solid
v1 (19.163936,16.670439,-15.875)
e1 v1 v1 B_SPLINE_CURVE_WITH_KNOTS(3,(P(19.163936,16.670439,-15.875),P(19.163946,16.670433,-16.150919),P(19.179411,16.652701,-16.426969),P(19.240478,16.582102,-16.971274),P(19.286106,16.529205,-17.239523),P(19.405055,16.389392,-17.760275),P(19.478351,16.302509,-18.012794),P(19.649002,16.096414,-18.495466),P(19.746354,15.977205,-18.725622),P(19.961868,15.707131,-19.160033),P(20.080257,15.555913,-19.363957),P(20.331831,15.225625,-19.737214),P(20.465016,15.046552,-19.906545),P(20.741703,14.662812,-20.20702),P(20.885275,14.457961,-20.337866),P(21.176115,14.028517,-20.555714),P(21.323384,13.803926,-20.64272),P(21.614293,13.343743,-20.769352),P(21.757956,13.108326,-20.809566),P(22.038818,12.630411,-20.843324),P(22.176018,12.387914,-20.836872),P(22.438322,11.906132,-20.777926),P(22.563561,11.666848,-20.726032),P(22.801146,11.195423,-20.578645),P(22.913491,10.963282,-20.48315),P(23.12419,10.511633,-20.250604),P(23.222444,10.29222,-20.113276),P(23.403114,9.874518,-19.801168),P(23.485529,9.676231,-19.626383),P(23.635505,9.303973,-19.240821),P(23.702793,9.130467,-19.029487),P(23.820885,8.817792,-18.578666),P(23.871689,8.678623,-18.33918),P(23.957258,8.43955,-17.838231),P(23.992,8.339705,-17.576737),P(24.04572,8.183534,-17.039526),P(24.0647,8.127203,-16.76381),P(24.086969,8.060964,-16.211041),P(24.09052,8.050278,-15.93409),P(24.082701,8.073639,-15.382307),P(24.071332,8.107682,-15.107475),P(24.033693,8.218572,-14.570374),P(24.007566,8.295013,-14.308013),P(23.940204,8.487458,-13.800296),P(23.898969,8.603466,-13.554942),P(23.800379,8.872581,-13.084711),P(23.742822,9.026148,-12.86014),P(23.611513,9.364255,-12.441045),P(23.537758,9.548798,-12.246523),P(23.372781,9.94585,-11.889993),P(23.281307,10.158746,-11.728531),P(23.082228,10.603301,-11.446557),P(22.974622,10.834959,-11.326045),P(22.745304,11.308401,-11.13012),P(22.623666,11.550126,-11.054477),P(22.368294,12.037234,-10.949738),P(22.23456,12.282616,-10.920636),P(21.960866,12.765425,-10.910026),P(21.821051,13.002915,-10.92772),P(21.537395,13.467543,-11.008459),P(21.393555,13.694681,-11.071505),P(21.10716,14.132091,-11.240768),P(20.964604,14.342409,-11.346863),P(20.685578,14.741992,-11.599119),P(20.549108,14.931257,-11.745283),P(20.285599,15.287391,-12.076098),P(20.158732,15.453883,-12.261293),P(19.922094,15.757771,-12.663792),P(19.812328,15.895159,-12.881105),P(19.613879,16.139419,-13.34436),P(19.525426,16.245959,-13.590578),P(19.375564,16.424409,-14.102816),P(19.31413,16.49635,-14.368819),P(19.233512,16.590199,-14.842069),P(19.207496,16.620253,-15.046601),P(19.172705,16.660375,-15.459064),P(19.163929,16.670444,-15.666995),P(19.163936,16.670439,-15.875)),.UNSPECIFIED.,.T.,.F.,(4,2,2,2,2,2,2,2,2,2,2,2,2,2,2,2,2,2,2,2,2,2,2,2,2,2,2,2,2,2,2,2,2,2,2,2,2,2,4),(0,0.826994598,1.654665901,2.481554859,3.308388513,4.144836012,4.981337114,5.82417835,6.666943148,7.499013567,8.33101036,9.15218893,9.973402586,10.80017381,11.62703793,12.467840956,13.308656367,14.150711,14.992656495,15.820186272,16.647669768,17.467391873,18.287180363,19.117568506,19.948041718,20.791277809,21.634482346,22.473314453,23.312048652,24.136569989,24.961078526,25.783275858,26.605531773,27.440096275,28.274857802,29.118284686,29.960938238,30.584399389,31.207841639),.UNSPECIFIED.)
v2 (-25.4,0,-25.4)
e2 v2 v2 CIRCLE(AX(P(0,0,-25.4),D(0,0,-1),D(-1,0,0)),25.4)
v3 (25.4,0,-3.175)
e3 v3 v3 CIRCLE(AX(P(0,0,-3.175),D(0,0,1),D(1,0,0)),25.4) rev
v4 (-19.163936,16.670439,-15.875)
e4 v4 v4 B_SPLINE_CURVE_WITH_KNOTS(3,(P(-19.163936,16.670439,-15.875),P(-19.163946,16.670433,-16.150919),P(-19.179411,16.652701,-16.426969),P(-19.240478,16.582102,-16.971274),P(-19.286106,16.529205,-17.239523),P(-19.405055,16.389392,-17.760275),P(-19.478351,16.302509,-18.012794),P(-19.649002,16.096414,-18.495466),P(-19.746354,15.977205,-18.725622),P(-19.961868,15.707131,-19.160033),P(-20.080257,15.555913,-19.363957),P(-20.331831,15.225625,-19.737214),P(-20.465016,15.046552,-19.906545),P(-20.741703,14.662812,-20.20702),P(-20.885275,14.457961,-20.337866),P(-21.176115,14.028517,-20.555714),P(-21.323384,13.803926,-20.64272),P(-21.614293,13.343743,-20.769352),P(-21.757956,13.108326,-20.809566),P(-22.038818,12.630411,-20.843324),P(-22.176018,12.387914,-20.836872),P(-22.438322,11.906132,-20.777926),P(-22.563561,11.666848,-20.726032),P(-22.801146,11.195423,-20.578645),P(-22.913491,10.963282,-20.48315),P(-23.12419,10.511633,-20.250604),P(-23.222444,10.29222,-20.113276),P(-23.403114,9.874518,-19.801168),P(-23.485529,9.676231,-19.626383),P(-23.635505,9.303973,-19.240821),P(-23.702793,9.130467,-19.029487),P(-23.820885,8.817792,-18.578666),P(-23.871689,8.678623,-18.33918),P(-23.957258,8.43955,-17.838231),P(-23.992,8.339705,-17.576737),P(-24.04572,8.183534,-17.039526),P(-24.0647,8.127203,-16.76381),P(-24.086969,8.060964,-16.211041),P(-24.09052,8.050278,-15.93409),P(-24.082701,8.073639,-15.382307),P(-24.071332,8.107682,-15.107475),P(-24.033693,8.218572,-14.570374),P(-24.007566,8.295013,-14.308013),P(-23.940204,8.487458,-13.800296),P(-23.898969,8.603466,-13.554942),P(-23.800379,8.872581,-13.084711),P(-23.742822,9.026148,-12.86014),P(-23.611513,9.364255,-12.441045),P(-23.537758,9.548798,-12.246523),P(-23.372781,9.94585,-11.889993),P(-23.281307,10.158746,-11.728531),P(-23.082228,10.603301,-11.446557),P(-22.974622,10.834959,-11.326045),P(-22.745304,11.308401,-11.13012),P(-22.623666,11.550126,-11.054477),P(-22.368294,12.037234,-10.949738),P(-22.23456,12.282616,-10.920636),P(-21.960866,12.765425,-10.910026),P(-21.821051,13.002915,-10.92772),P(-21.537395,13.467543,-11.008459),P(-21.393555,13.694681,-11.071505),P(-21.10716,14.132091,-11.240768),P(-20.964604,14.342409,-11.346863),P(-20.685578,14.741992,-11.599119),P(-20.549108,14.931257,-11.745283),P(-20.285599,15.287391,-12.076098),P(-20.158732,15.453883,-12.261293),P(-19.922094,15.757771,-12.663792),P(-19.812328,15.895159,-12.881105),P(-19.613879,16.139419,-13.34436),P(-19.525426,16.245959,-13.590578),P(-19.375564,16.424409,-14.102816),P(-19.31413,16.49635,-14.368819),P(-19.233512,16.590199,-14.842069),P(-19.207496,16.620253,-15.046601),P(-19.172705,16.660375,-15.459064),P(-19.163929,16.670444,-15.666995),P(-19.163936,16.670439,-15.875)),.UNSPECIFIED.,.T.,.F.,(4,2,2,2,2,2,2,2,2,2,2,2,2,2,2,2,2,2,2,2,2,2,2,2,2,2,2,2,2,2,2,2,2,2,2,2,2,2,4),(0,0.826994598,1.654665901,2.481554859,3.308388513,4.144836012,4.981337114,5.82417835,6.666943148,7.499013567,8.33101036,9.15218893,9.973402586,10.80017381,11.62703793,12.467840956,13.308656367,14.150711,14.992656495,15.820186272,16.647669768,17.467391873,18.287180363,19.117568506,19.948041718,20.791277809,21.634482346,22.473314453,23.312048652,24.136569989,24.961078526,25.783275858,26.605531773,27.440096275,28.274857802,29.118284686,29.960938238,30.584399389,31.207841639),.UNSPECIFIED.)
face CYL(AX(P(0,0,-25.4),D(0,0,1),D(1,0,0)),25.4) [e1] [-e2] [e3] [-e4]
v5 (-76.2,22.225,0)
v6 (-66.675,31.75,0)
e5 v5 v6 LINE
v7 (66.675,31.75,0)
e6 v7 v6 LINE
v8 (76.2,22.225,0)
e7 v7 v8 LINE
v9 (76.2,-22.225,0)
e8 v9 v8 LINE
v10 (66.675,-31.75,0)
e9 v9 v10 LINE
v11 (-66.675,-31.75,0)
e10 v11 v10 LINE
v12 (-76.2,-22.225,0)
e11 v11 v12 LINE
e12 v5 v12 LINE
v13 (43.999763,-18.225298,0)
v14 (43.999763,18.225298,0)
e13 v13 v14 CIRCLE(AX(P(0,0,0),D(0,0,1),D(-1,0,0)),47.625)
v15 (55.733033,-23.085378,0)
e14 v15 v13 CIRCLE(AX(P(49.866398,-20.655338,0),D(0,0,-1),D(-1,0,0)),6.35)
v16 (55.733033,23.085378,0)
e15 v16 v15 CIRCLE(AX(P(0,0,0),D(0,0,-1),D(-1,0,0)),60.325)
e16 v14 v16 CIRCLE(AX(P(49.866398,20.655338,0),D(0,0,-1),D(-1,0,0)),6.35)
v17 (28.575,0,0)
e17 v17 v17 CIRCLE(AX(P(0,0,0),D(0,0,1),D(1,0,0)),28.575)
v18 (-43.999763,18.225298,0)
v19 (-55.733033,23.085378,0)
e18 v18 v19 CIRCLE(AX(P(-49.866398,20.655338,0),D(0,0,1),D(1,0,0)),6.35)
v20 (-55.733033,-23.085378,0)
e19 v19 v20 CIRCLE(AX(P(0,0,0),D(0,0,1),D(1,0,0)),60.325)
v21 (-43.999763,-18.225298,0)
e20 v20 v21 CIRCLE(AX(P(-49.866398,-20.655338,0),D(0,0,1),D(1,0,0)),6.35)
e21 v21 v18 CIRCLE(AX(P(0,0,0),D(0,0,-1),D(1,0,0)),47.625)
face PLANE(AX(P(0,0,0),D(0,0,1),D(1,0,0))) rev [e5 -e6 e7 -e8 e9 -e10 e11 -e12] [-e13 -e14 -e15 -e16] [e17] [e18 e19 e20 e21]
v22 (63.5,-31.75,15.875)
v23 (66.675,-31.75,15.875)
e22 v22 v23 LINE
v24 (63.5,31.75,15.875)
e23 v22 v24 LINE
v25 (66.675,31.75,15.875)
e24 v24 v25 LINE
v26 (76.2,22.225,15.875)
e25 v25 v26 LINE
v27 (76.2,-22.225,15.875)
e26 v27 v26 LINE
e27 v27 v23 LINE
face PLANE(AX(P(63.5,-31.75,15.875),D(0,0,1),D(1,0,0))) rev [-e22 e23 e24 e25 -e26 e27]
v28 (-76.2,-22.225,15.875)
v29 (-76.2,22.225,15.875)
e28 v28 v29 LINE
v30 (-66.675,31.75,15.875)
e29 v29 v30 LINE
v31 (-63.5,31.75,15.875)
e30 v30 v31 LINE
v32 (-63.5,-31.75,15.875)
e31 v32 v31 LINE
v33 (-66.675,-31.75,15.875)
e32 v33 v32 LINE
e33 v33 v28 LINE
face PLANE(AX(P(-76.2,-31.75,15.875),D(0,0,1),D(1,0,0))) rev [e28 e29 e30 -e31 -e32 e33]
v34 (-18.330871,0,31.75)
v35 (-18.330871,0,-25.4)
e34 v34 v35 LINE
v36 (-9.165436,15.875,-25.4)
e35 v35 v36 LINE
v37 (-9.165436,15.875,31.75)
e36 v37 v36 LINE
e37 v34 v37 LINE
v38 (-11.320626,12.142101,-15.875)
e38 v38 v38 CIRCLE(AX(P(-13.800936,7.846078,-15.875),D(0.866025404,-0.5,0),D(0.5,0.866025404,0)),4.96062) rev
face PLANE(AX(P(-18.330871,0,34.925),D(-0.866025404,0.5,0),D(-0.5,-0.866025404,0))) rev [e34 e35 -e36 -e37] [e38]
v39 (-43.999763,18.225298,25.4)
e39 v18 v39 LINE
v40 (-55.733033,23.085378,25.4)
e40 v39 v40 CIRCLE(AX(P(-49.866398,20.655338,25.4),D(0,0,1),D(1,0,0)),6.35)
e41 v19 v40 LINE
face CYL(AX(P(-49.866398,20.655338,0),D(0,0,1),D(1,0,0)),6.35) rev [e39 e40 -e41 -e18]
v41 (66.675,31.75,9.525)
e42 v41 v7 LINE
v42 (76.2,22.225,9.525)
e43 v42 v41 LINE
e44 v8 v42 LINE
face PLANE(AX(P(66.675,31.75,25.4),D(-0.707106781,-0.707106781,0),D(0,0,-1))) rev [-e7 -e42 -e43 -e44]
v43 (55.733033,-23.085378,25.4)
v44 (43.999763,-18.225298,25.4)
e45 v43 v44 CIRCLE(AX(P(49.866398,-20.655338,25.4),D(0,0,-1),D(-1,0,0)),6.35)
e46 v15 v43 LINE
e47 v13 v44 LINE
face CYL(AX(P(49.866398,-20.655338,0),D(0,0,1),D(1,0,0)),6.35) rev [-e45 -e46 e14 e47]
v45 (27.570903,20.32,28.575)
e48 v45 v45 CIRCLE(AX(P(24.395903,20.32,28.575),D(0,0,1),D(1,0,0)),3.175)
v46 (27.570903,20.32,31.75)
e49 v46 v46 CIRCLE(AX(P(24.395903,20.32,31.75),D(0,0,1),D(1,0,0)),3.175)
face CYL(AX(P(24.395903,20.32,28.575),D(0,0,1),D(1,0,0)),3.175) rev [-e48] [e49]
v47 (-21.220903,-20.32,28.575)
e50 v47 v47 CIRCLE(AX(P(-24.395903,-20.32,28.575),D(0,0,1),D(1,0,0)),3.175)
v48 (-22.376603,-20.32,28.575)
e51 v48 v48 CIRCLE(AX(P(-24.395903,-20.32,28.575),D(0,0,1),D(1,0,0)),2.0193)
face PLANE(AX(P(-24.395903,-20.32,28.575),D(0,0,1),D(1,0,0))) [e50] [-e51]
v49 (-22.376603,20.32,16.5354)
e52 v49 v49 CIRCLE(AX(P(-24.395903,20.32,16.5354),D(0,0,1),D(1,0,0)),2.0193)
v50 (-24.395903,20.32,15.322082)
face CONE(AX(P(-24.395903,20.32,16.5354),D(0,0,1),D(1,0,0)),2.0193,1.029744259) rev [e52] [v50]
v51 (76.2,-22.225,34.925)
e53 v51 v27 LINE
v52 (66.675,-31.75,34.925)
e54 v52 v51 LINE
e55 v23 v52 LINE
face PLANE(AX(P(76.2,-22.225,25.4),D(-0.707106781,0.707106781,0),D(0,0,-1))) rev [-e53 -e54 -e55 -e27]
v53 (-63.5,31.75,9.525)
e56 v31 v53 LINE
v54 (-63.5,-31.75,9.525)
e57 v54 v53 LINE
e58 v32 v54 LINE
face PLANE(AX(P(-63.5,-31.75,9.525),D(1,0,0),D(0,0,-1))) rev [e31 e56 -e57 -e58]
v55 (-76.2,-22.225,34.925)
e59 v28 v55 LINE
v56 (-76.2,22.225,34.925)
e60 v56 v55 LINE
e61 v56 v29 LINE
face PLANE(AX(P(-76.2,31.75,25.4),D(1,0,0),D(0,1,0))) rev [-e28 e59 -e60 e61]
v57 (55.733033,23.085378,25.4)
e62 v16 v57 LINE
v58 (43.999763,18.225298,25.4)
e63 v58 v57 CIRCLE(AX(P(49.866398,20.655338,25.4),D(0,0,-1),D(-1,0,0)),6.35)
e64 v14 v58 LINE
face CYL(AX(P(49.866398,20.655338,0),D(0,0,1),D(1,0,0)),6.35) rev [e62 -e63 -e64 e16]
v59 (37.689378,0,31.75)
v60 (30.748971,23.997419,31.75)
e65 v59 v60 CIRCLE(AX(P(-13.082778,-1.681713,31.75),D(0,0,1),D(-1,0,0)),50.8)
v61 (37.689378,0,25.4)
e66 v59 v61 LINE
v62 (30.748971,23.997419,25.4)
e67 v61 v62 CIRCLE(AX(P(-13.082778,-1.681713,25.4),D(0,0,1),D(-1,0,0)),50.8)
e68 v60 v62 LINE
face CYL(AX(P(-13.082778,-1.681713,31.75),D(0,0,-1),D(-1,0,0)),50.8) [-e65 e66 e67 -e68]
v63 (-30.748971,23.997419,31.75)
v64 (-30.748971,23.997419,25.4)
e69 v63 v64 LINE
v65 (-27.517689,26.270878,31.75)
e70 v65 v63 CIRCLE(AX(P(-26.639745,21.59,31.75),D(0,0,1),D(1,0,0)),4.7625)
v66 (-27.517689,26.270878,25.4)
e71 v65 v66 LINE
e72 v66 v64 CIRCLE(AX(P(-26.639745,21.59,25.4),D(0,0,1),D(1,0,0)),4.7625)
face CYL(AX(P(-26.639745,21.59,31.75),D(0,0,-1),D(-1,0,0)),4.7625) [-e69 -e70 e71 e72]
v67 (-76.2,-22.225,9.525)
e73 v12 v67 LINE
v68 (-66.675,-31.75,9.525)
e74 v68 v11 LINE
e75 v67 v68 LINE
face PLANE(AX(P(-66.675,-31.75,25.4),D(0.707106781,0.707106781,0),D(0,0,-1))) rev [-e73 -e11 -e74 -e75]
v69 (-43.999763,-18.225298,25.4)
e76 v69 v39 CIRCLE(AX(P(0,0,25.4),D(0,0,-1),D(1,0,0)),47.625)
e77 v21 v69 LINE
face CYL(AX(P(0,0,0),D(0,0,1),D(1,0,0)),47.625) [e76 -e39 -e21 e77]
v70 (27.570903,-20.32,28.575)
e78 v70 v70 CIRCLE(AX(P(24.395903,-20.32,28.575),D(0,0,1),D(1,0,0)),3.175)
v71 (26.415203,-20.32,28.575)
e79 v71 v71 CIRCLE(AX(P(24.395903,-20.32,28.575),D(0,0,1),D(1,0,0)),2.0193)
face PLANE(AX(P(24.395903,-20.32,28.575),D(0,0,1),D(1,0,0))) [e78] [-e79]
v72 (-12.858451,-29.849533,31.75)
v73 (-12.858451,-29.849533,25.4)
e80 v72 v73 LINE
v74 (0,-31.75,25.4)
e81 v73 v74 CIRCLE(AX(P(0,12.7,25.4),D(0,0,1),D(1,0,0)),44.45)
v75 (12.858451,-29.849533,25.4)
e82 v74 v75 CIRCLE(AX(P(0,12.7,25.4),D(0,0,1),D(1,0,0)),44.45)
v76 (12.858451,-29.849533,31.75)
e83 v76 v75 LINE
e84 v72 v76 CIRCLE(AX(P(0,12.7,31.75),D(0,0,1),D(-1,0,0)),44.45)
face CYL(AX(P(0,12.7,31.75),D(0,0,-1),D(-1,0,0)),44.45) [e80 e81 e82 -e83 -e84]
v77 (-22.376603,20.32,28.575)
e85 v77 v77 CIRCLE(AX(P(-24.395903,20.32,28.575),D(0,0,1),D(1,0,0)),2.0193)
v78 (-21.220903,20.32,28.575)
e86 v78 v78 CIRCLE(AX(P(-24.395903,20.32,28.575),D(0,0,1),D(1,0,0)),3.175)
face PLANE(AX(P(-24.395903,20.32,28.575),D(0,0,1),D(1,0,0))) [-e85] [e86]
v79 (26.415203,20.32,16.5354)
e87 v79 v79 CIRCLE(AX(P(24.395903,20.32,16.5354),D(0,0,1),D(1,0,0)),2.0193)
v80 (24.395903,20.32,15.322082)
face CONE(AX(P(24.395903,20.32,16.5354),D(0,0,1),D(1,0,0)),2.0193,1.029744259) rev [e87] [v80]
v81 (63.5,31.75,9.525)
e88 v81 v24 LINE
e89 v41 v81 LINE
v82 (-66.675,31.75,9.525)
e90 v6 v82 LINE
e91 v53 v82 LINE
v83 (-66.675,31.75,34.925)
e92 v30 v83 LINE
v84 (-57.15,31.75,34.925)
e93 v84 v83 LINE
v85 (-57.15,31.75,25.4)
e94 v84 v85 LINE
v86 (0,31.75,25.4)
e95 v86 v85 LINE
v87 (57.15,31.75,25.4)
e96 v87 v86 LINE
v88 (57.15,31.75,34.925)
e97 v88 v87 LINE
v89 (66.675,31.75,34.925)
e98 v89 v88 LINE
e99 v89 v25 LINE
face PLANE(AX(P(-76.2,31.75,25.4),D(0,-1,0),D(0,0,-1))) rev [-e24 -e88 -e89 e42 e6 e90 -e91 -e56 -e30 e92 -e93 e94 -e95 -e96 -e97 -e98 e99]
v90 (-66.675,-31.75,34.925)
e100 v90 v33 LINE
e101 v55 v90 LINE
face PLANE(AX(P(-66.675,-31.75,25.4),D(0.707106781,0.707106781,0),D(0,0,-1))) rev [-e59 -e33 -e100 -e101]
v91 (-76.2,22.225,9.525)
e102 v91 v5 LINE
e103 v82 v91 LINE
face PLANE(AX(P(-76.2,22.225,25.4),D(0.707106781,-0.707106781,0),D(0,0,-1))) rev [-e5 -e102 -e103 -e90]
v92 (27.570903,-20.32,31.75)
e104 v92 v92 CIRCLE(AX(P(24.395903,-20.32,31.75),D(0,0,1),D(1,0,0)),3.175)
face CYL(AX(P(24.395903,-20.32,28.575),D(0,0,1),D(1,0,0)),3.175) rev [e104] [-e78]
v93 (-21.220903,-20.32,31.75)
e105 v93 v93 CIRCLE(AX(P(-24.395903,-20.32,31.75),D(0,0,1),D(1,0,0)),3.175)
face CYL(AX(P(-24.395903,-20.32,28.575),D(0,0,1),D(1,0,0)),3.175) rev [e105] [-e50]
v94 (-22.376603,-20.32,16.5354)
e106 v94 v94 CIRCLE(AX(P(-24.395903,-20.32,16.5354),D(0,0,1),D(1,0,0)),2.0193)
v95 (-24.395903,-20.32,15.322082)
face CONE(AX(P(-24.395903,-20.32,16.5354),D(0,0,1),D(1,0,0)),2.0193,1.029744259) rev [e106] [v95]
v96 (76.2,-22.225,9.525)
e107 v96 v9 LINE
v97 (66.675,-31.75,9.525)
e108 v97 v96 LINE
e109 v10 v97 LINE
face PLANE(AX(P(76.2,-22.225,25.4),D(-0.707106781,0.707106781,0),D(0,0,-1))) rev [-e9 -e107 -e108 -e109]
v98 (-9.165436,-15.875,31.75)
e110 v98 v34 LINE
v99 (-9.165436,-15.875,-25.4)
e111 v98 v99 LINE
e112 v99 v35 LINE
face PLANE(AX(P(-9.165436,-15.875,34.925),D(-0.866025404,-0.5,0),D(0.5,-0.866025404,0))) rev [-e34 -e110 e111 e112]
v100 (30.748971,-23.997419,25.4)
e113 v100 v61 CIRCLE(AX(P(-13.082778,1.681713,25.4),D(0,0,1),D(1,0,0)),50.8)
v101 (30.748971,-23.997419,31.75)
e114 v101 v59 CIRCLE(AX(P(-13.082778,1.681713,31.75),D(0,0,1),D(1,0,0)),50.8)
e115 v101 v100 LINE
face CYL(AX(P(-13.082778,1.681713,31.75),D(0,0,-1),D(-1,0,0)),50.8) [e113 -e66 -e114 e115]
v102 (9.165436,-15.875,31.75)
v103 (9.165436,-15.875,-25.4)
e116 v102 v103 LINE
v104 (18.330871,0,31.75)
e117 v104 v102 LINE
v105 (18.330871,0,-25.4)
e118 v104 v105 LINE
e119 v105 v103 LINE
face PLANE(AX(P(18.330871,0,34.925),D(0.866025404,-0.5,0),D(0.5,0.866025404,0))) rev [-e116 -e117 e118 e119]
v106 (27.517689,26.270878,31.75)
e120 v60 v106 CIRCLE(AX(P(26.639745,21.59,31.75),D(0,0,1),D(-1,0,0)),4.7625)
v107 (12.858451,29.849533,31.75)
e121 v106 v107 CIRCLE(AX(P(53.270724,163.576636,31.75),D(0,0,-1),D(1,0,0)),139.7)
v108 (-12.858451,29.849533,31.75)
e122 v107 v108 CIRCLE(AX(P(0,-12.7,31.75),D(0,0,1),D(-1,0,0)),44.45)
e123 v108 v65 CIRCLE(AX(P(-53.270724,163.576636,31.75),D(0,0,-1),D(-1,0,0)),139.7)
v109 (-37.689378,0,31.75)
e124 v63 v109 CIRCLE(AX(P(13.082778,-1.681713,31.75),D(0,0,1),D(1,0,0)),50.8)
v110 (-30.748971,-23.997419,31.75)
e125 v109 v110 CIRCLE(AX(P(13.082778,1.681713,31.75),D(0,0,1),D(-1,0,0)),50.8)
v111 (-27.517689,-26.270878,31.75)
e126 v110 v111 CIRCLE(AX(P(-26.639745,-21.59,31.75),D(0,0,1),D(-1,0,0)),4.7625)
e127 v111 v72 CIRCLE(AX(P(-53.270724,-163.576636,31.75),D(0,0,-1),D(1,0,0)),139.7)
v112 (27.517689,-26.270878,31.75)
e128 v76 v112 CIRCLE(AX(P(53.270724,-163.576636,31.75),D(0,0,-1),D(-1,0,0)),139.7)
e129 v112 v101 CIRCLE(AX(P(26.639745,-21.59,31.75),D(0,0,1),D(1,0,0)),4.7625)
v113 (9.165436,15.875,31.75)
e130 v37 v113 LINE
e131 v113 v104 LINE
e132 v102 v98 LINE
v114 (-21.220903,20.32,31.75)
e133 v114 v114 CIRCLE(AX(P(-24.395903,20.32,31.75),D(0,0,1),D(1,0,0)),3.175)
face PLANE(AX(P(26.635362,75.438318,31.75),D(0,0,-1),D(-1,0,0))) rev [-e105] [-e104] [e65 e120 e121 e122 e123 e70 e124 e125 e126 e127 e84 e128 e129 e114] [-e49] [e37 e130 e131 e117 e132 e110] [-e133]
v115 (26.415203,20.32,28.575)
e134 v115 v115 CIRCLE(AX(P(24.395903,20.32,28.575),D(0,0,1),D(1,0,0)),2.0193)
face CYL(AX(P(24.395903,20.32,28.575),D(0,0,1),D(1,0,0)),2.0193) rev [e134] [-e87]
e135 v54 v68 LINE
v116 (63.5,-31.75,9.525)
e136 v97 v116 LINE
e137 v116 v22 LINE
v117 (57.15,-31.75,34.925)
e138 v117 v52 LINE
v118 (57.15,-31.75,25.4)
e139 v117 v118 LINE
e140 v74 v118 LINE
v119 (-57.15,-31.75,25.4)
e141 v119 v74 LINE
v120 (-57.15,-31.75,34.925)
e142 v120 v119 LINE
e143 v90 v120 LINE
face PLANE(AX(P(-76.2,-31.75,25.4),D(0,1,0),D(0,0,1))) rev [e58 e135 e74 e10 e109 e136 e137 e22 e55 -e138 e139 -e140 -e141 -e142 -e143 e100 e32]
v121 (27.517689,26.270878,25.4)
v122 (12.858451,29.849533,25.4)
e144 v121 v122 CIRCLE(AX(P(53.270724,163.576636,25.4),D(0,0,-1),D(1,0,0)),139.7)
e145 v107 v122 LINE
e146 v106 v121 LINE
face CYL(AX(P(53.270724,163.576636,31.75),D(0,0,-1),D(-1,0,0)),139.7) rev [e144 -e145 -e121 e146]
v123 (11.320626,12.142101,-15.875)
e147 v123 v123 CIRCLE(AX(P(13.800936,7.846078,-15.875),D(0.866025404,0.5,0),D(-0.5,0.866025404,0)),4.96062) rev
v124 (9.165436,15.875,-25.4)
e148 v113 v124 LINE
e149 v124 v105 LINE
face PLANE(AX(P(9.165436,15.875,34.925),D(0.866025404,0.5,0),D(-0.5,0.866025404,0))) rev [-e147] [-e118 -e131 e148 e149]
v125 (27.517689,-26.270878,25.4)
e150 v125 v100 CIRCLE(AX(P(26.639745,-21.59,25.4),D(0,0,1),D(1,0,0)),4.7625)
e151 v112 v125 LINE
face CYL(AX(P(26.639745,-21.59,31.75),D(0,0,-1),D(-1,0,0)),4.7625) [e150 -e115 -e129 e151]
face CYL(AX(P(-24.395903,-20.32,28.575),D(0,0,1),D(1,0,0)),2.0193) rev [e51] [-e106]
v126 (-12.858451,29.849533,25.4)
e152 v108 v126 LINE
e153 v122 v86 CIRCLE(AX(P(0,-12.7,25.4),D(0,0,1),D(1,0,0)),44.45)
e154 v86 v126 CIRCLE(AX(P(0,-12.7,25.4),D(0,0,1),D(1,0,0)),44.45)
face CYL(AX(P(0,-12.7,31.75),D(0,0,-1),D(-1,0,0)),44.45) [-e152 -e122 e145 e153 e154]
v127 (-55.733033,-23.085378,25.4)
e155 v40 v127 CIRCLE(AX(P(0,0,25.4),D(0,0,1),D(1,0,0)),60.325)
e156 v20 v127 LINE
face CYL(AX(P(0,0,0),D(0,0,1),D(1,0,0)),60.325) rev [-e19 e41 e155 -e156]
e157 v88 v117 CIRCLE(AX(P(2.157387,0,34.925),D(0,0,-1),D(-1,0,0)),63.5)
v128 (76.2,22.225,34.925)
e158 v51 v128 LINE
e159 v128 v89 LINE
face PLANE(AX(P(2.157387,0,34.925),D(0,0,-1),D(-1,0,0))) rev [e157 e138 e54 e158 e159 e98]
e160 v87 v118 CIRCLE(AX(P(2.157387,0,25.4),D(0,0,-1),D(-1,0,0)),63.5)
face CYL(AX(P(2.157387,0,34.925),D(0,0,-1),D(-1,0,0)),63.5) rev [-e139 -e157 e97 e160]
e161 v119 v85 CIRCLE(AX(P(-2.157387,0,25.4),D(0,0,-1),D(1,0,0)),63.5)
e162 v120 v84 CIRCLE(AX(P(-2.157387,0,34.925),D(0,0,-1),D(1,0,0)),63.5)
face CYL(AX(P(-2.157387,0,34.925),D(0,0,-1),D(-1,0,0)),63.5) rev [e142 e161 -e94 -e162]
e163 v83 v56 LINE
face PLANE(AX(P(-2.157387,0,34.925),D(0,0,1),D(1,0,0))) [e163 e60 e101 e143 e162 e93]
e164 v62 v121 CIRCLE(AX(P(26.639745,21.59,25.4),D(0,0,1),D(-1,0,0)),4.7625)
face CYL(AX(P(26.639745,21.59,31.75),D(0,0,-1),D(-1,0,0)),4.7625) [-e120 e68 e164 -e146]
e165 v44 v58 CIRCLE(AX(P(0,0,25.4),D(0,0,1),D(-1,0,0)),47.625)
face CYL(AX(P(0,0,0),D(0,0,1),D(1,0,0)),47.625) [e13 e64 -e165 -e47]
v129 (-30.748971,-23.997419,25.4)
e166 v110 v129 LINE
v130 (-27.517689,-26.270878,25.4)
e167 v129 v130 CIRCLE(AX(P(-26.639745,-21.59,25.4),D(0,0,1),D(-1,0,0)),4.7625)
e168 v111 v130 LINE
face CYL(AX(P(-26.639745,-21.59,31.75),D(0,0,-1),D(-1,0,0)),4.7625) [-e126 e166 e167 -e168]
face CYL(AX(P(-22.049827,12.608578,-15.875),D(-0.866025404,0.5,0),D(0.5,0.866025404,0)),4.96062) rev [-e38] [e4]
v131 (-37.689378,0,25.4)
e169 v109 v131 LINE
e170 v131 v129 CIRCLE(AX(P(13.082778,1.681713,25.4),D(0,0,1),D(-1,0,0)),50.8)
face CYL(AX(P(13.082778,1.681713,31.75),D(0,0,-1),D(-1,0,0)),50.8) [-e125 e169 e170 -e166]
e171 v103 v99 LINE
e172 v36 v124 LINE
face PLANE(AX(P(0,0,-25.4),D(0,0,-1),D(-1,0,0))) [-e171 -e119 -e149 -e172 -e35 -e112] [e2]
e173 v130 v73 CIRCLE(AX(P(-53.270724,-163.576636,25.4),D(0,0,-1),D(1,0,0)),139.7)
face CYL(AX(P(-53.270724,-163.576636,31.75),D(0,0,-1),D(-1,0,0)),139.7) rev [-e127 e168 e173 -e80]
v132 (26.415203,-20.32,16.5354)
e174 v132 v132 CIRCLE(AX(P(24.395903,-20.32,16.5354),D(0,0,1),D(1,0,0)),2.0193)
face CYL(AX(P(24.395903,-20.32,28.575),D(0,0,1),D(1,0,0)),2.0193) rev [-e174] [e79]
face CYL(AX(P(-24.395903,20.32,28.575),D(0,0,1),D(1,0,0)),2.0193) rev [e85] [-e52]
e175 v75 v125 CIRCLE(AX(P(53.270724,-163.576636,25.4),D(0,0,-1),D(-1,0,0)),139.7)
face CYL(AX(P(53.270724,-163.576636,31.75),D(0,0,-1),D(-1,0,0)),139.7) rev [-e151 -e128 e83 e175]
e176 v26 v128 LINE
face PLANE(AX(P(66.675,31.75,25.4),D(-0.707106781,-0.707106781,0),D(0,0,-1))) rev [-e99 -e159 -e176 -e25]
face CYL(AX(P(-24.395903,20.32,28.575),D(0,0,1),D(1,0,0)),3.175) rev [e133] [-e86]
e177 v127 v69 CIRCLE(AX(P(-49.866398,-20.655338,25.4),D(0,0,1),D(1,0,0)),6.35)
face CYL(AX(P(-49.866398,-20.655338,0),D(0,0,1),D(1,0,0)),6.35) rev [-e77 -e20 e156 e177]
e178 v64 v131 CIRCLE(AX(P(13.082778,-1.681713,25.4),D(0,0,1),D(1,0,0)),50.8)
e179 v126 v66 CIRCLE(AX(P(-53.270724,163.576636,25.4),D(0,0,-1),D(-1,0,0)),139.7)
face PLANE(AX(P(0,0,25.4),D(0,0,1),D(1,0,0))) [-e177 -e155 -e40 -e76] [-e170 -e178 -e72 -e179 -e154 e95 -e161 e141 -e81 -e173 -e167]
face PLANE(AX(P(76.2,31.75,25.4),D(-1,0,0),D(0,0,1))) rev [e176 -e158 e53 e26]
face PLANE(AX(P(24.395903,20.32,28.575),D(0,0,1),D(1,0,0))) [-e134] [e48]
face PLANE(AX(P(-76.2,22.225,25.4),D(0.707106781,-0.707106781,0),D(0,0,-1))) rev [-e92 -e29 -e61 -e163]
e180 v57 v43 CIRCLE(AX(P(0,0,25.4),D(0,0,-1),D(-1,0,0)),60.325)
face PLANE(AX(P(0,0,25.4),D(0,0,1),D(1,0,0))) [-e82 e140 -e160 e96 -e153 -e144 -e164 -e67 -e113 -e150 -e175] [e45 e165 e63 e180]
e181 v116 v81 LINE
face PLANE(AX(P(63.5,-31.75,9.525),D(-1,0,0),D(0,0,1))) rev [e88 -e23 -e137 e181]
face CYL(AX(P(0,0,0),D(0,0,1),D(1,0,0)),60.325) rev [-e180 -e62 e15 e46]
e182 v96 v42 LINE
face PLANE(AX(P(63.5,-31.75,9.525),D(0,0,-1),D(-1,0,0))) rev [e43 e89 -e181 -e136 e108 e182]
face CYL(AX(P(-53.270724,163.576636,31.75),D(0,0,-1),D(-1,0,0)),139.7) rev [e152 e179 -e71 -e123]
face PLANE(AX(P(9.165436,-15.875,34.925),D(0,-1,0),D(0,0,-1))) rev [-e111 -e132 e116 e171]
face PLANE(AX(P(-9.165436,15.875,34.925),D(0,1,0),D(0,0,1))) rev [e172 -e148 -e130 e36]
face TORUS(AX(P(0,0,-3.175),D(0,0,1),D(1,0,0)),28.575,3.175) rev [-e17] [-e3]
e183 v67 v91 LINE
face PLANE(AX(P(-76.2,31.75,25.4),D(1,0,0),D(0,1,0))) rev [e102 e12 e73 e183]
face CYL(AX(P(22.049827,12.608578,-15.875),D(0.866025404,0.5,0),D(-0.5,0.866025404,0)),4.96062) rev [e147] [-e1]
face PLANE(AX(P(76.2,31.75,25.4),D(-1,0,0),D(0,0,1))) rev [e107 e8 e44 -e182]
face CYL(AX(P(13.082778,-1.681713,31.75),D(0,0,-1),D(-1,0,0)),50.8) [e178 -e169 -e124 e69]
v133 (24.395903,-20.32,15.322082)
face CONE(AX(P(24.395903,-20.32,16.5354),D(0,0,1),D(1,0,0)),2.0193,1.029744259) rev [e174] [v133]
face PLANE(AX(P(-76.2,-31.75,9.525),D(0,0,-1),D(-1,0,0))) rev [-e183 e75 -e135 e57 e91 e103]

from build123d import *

# Parameters (mm, degrees)
SKETCH1_W                        = 152.4
SKETCH1_H                        = 63.5
BOSS_EXTRUDE1_DEPTH              = 25.4
BOSS_EXTRUDE2_DEPTH              = 9.525
BOSS_EXTRUDE3_DEPTH              = 6.35
CUT_EXTRUDE1_DEPTH               = 87.36933773
SKETCH5_R                        = 25.4
BOSS_EXTRUDE4_DEPTH              = 25.4
CUT_EXTRUDE2_DEPTH               = 103.242887894
F_7_16_20_TAPPED_HOLE2_OUTLINE_W = 4.96062
F_7_16_20_TAPPED_HOLE2_OUTLINE_H = 9.52526547
SKETCH13_R                       = 3.175
CUT_EXTRUDE3_DEPTH               = 3.175
F_10_32_TAPPED_HOLE1_D           = 4.0386
F_10_32_TAPPED_HOLE1_DEPTH       = 12.0396
F_10_32_TAPPED_HOLE1_TIP         = 1.213317848
FILLET1_R                        = 3.175
SKETCH16_W                       = 12.7
SKETCH16_H                       = 6.35
CUT_EXTRUDE4_DEPTH               = 106.159144277
CHAMFER1_SIZE                    = 9.525
CHAMFER2_SIZE                    = 9.525


# Read off the part's stored shape, not the designer's step: 7/16-20 Tapped Hole2
with BuildPart() as part:
    # Sketch1 → Boss-Extrude1 (new body)
    with BuildSketch(Plane.XY):
        Rectangle(SKETCH1_W, SKETCH1_H)
    extrude(amount=BOSS_EXTRUDE1_DEPTH)

    # Sketch2 → Boss-Extrude2 (add)
    with BuildSketch(Plane.XY.offset(25.4)):
        with BuildLine():
            Line((-57.15, 31.75), (-76.2, 31.75))
            Line((-76.2, 31.75), (-76.2, -31.75))
            Line((-76.2, -31.75), (-57.15, -31.75))
            ThreePointArc((-57.15, -31.75), (-65.65738686, 0), (-57.15, 31.75))
        make_face()
        with BuildLine():
            Line((57.15, 31.75), (76.2, 31.75))
            Line((76.2, 31.75), (76.2, -31.75))
            Line((76.2, -31.75), (57.15, -31.75))
            ThreePointArc((57.15, -31.75), (65.65738686, 0), (57.15, 31.75))
        make_face()
    extrude(amount=BOSS_EXTRUDE2_DEPTH)

    # Sketch3 → Boss-Extrude3 (add)
    with BuildSketch(Plane.XY.offset(25.4)):
        with BuildLine():
            ThreePointArc((0, 31.75), (-6.499067792, 31.272316494), (-12.858450657, 29.849532861))
            ThreePointArc((-12.858450657, 29.849532861), (-20.139715933, 27.86213325), (-27.51768912, 26.270878114))
            ThreePointArc((-27.51768912, 26.270878114), (-29.380205079, 25.48503317), (-30.748971212, 23.997418552))
            ThreePointArc((-30.748971212, 23.997418552), (-35.717260564, 12.431977761), (-37.689378393, 0))
            ThreePointArc((-37.689378393, 0), (-35.717260564, -12.431977761), (-30.748971212, -23.997418552))
            ThreePointArc((-30.748971212, -23.997418552), (-29.380205079, -25.48503317), (-27.51768912, -26.270878114))
            ThreePointArc((-27.51768912, -26.270878114), (-20.139715933, -27.86213325), (-12.858450657, -29.849532861))
            ThreePointArc((-12.858450657, -29.849532861), (-6.499067792, -31.272316494), (0, -31.75))
            ThreePointArc((0, -31.75), (6.499067792, -31.272316494), (12.858450657, -29.849532861))
            ThreePointArc((12.858450657, -29.849532861), (20.139715933, -27.86213325), (27.51768912, -26.270878114))
            ThreePointArc((27.51768912, -26.270878114), (29.380205079, -25.48503317), (30.748971212, -23.997418552))
            ThreePointArc((30.748971212, -23.997418552), (35.717260564, -12.431977761), (37.689378393, 0))
            ThreePointArc((37.689378393, 0), (35.717260564, 12.431977761), (30.748971212, 23.997418552))
            ThreePointArc((30.748971212, 23.997418552), (29.380205079, 25.48503317), (27.51768912, 26.270878114))
            ThreePointArc((27.51768912, 26.270878114), (20.139715933, 27.86213325), (12.858450657, 29.849532861))
            ThreePointArc((12.858450657, 29.849532861), (6.499067792, 31.272316494), (0, 31.75))
        make_face()
    extrude(amount=BOSS_EXTRUDE3_DEPTH)

    # Sketch4 → Cut-Extrude1 (cut, through all)
    with BuildSketch(Plane.XY.offset(25.4)):
        with BuildLine():
            ThreePointArc((-55.733032799, 23.085378057), (-60.325, 0), (-55.733032799, -23.085378057))
            ThreePointArc((-55.733032799, -23.085378057), (-47.436357972, -26.521973293), (-43.999762736, -18.225298466))
            ThreePointArc((-43.999762736, -18.225298466), (-47.625, 0), (-43.999762736, 18.225298466))
            ThreePointArc((-43.999762736, 18.225298466), (-47.436357972, 26.521973293), (-55.733032799, 23.085378057))
        make_face()
    cut_extrude1 = extrude(amount=-CUT_EXTRUDE1_DEPTH, mode=Mode.SUBTRACT)

    # Mirror1: Cut-Extrude1 across plane
    add(cut_extrude1.mirror(Plane(origin=(0, 0, 0), x_dir=(0, 0, 1), z_dir=(1, 0, 0))), mode=Mode.SUBTRACT)

    # Sketch5 → Boss-Extrude4 (add)
    with BuildSketch(Plane(origin=(0, 0, 0), x_dir=(-1, 0, 0), z_dir=(0, 0, -1))):
        with Locations(Location((0, 0, 0), (0, 0, 180))):
            Circle(SKETCH5_R)
    extrude(amount=BOSS_EXTRUDE4_DEPTH)

    # Sketch6 → Cut-Extrude2 (cut, through all)
    with BuildSketch(Plane(origin=(0, 0, -25.4), x_dir=(-1, 0, 0), z_dir=(0, 0, -1))):
        Polygon((9.165435523, -15.875), (18.330871047, 0), (9.165435523, 15.875), (-9.165435523, 15.875), (-18.330871047, 0), (-9.165435523, -15.875), align=None)
    extrude(amount=-CUT_EXTRUDE2_DEPTH, mode=Mode.SUBTRACT)

    # 7/16-20 Tapped Hole2 outline → 7/16-20 Tapped Hole2 (revolve, cut)
    with BuildSketch(Plane(origin=(0.052782238, -0.091421518, -15.875), x_dir=(0.5000000000000003, -0.8660254037844385, 0), z_dir=(0, 0, 1))):
        with Locations((2.48031, 20.637632735)):
            Rectangle(F_7_16_20_TAPPED_HOLE2_OUTLINE_W, F_7_16_20_TAPPED_HOLE2_OUTLINE_H)
    f_7_16_20_tapped_hole2 = revolve(axis=Axis((0.052782238, -0.091421518, -15.875), (0.8660254037844385, 0.5000000000000003, 0)), mode=Mode.SUBTRACT)

    # Mirror6: 7/16-20 Tapped Hole2 across plane
    add(f_7_16_20_tapped_hole2.mirror(Plane(origin=(0, 0, 0), x_dir=(0, 0, 1), z_dir=(1, 0, 0))), mode=Mode.SUBTRACT)

    # Sketch13 → Cut-Extrude3 (cut)
    with BuildSketch(Plane.XY.offset(31.75)):
        with Locations((-24.395903345, 20.32)):
            Circle(SKETCH13_R)
        with Locations((24.395903345, 20.32)):
            Circle(SKETCH13_R)
        with Locations((24.395903345, -20.32)):
            Circle(SKETCH13_R)
        with Locations((-24.395903345, -20.32)):
            Circle(SKETCH13_R)
    extrude(amount=-CUT_EXTRUDE3_DEPTH, mode=Mode.SUBTRACT)

    # #10-32 Tapped Hole1
    with Locations(Plane.XY.offset(28.575)):
        with Locations((-24.395903345, 20.32), (24.395903345, 20.32), (24.395903345, -20.32), (-24.395903345, -20.32)):
            Hole(F_10_32_TAPPED_HOLE1_D / 2, depth=F_10_32_TAPPED_HOLE1_DEPTH)
            with Locations((0, 0, -(F_10_32_TAPPED_HOLE1_DEPTH + F_10_32_TAPPED_HOLE1_TIP / 2))):  # 118° drill point
                Cone(0, F_10_32_TAPPED_HOLE1_D / 2, F_10_32_TAPPED_HOLE1_TIP, mode=Mode.SUBTRACT)

    # Fillet1
    fillet1_edges = [part.edges().sort_by_distance(p)[0] for p in [
        (-25.4, 0, 0),
    ]]
    fillet(fillet1_edges, radius=FILLET1_R)

    # Sketch16 → Cut-Extrude4 (cut, through all)
    with BuildSketch(Plane(origin=(0, 31.75, 0), x_dir=(1, 0, 0), z_dir=(0, 1, 0))):
        with Locations((69.85, -12.7)):
            Rectangle(SKETCH16_W, SKETCH16_H)
        with Locations((-69.85, -12.7)):
            Rectangle(SKETCH16_W, SKETCH16_H)
    extrude(amount=-CUT_EXTRUDE4_DEPTH, mode=Mode.SUBTRACT)

    # Chamfer1
    chamfer1_edges = [part.edges().sort_by_distance(p)[0] for p in [
        (-76.2, 31.75, 4.7625),
        (76.2, 31.75, 4.7625),
        (-76.2, 31.75, 25.4),
        (76.2, 31.75, 25.4),
    ]]
    chamfer(chamfer1_edges, length=CHAMFER1_SIZE)

    # Chamfer2
    chamfer2_edges = [part.edges().sort_by_distance(p)[0] for p in [
        (76.2, -31.75, 4.7625),
        (-76.2, -31.75, 4.7625),
        (76.2, -31.75, 25.4),
        (-76.2, -31.75, 25.4),
    ]]
    chamfer(chamfer2_edges, length=CHAMFER2_SIZE)


solid = part.part
